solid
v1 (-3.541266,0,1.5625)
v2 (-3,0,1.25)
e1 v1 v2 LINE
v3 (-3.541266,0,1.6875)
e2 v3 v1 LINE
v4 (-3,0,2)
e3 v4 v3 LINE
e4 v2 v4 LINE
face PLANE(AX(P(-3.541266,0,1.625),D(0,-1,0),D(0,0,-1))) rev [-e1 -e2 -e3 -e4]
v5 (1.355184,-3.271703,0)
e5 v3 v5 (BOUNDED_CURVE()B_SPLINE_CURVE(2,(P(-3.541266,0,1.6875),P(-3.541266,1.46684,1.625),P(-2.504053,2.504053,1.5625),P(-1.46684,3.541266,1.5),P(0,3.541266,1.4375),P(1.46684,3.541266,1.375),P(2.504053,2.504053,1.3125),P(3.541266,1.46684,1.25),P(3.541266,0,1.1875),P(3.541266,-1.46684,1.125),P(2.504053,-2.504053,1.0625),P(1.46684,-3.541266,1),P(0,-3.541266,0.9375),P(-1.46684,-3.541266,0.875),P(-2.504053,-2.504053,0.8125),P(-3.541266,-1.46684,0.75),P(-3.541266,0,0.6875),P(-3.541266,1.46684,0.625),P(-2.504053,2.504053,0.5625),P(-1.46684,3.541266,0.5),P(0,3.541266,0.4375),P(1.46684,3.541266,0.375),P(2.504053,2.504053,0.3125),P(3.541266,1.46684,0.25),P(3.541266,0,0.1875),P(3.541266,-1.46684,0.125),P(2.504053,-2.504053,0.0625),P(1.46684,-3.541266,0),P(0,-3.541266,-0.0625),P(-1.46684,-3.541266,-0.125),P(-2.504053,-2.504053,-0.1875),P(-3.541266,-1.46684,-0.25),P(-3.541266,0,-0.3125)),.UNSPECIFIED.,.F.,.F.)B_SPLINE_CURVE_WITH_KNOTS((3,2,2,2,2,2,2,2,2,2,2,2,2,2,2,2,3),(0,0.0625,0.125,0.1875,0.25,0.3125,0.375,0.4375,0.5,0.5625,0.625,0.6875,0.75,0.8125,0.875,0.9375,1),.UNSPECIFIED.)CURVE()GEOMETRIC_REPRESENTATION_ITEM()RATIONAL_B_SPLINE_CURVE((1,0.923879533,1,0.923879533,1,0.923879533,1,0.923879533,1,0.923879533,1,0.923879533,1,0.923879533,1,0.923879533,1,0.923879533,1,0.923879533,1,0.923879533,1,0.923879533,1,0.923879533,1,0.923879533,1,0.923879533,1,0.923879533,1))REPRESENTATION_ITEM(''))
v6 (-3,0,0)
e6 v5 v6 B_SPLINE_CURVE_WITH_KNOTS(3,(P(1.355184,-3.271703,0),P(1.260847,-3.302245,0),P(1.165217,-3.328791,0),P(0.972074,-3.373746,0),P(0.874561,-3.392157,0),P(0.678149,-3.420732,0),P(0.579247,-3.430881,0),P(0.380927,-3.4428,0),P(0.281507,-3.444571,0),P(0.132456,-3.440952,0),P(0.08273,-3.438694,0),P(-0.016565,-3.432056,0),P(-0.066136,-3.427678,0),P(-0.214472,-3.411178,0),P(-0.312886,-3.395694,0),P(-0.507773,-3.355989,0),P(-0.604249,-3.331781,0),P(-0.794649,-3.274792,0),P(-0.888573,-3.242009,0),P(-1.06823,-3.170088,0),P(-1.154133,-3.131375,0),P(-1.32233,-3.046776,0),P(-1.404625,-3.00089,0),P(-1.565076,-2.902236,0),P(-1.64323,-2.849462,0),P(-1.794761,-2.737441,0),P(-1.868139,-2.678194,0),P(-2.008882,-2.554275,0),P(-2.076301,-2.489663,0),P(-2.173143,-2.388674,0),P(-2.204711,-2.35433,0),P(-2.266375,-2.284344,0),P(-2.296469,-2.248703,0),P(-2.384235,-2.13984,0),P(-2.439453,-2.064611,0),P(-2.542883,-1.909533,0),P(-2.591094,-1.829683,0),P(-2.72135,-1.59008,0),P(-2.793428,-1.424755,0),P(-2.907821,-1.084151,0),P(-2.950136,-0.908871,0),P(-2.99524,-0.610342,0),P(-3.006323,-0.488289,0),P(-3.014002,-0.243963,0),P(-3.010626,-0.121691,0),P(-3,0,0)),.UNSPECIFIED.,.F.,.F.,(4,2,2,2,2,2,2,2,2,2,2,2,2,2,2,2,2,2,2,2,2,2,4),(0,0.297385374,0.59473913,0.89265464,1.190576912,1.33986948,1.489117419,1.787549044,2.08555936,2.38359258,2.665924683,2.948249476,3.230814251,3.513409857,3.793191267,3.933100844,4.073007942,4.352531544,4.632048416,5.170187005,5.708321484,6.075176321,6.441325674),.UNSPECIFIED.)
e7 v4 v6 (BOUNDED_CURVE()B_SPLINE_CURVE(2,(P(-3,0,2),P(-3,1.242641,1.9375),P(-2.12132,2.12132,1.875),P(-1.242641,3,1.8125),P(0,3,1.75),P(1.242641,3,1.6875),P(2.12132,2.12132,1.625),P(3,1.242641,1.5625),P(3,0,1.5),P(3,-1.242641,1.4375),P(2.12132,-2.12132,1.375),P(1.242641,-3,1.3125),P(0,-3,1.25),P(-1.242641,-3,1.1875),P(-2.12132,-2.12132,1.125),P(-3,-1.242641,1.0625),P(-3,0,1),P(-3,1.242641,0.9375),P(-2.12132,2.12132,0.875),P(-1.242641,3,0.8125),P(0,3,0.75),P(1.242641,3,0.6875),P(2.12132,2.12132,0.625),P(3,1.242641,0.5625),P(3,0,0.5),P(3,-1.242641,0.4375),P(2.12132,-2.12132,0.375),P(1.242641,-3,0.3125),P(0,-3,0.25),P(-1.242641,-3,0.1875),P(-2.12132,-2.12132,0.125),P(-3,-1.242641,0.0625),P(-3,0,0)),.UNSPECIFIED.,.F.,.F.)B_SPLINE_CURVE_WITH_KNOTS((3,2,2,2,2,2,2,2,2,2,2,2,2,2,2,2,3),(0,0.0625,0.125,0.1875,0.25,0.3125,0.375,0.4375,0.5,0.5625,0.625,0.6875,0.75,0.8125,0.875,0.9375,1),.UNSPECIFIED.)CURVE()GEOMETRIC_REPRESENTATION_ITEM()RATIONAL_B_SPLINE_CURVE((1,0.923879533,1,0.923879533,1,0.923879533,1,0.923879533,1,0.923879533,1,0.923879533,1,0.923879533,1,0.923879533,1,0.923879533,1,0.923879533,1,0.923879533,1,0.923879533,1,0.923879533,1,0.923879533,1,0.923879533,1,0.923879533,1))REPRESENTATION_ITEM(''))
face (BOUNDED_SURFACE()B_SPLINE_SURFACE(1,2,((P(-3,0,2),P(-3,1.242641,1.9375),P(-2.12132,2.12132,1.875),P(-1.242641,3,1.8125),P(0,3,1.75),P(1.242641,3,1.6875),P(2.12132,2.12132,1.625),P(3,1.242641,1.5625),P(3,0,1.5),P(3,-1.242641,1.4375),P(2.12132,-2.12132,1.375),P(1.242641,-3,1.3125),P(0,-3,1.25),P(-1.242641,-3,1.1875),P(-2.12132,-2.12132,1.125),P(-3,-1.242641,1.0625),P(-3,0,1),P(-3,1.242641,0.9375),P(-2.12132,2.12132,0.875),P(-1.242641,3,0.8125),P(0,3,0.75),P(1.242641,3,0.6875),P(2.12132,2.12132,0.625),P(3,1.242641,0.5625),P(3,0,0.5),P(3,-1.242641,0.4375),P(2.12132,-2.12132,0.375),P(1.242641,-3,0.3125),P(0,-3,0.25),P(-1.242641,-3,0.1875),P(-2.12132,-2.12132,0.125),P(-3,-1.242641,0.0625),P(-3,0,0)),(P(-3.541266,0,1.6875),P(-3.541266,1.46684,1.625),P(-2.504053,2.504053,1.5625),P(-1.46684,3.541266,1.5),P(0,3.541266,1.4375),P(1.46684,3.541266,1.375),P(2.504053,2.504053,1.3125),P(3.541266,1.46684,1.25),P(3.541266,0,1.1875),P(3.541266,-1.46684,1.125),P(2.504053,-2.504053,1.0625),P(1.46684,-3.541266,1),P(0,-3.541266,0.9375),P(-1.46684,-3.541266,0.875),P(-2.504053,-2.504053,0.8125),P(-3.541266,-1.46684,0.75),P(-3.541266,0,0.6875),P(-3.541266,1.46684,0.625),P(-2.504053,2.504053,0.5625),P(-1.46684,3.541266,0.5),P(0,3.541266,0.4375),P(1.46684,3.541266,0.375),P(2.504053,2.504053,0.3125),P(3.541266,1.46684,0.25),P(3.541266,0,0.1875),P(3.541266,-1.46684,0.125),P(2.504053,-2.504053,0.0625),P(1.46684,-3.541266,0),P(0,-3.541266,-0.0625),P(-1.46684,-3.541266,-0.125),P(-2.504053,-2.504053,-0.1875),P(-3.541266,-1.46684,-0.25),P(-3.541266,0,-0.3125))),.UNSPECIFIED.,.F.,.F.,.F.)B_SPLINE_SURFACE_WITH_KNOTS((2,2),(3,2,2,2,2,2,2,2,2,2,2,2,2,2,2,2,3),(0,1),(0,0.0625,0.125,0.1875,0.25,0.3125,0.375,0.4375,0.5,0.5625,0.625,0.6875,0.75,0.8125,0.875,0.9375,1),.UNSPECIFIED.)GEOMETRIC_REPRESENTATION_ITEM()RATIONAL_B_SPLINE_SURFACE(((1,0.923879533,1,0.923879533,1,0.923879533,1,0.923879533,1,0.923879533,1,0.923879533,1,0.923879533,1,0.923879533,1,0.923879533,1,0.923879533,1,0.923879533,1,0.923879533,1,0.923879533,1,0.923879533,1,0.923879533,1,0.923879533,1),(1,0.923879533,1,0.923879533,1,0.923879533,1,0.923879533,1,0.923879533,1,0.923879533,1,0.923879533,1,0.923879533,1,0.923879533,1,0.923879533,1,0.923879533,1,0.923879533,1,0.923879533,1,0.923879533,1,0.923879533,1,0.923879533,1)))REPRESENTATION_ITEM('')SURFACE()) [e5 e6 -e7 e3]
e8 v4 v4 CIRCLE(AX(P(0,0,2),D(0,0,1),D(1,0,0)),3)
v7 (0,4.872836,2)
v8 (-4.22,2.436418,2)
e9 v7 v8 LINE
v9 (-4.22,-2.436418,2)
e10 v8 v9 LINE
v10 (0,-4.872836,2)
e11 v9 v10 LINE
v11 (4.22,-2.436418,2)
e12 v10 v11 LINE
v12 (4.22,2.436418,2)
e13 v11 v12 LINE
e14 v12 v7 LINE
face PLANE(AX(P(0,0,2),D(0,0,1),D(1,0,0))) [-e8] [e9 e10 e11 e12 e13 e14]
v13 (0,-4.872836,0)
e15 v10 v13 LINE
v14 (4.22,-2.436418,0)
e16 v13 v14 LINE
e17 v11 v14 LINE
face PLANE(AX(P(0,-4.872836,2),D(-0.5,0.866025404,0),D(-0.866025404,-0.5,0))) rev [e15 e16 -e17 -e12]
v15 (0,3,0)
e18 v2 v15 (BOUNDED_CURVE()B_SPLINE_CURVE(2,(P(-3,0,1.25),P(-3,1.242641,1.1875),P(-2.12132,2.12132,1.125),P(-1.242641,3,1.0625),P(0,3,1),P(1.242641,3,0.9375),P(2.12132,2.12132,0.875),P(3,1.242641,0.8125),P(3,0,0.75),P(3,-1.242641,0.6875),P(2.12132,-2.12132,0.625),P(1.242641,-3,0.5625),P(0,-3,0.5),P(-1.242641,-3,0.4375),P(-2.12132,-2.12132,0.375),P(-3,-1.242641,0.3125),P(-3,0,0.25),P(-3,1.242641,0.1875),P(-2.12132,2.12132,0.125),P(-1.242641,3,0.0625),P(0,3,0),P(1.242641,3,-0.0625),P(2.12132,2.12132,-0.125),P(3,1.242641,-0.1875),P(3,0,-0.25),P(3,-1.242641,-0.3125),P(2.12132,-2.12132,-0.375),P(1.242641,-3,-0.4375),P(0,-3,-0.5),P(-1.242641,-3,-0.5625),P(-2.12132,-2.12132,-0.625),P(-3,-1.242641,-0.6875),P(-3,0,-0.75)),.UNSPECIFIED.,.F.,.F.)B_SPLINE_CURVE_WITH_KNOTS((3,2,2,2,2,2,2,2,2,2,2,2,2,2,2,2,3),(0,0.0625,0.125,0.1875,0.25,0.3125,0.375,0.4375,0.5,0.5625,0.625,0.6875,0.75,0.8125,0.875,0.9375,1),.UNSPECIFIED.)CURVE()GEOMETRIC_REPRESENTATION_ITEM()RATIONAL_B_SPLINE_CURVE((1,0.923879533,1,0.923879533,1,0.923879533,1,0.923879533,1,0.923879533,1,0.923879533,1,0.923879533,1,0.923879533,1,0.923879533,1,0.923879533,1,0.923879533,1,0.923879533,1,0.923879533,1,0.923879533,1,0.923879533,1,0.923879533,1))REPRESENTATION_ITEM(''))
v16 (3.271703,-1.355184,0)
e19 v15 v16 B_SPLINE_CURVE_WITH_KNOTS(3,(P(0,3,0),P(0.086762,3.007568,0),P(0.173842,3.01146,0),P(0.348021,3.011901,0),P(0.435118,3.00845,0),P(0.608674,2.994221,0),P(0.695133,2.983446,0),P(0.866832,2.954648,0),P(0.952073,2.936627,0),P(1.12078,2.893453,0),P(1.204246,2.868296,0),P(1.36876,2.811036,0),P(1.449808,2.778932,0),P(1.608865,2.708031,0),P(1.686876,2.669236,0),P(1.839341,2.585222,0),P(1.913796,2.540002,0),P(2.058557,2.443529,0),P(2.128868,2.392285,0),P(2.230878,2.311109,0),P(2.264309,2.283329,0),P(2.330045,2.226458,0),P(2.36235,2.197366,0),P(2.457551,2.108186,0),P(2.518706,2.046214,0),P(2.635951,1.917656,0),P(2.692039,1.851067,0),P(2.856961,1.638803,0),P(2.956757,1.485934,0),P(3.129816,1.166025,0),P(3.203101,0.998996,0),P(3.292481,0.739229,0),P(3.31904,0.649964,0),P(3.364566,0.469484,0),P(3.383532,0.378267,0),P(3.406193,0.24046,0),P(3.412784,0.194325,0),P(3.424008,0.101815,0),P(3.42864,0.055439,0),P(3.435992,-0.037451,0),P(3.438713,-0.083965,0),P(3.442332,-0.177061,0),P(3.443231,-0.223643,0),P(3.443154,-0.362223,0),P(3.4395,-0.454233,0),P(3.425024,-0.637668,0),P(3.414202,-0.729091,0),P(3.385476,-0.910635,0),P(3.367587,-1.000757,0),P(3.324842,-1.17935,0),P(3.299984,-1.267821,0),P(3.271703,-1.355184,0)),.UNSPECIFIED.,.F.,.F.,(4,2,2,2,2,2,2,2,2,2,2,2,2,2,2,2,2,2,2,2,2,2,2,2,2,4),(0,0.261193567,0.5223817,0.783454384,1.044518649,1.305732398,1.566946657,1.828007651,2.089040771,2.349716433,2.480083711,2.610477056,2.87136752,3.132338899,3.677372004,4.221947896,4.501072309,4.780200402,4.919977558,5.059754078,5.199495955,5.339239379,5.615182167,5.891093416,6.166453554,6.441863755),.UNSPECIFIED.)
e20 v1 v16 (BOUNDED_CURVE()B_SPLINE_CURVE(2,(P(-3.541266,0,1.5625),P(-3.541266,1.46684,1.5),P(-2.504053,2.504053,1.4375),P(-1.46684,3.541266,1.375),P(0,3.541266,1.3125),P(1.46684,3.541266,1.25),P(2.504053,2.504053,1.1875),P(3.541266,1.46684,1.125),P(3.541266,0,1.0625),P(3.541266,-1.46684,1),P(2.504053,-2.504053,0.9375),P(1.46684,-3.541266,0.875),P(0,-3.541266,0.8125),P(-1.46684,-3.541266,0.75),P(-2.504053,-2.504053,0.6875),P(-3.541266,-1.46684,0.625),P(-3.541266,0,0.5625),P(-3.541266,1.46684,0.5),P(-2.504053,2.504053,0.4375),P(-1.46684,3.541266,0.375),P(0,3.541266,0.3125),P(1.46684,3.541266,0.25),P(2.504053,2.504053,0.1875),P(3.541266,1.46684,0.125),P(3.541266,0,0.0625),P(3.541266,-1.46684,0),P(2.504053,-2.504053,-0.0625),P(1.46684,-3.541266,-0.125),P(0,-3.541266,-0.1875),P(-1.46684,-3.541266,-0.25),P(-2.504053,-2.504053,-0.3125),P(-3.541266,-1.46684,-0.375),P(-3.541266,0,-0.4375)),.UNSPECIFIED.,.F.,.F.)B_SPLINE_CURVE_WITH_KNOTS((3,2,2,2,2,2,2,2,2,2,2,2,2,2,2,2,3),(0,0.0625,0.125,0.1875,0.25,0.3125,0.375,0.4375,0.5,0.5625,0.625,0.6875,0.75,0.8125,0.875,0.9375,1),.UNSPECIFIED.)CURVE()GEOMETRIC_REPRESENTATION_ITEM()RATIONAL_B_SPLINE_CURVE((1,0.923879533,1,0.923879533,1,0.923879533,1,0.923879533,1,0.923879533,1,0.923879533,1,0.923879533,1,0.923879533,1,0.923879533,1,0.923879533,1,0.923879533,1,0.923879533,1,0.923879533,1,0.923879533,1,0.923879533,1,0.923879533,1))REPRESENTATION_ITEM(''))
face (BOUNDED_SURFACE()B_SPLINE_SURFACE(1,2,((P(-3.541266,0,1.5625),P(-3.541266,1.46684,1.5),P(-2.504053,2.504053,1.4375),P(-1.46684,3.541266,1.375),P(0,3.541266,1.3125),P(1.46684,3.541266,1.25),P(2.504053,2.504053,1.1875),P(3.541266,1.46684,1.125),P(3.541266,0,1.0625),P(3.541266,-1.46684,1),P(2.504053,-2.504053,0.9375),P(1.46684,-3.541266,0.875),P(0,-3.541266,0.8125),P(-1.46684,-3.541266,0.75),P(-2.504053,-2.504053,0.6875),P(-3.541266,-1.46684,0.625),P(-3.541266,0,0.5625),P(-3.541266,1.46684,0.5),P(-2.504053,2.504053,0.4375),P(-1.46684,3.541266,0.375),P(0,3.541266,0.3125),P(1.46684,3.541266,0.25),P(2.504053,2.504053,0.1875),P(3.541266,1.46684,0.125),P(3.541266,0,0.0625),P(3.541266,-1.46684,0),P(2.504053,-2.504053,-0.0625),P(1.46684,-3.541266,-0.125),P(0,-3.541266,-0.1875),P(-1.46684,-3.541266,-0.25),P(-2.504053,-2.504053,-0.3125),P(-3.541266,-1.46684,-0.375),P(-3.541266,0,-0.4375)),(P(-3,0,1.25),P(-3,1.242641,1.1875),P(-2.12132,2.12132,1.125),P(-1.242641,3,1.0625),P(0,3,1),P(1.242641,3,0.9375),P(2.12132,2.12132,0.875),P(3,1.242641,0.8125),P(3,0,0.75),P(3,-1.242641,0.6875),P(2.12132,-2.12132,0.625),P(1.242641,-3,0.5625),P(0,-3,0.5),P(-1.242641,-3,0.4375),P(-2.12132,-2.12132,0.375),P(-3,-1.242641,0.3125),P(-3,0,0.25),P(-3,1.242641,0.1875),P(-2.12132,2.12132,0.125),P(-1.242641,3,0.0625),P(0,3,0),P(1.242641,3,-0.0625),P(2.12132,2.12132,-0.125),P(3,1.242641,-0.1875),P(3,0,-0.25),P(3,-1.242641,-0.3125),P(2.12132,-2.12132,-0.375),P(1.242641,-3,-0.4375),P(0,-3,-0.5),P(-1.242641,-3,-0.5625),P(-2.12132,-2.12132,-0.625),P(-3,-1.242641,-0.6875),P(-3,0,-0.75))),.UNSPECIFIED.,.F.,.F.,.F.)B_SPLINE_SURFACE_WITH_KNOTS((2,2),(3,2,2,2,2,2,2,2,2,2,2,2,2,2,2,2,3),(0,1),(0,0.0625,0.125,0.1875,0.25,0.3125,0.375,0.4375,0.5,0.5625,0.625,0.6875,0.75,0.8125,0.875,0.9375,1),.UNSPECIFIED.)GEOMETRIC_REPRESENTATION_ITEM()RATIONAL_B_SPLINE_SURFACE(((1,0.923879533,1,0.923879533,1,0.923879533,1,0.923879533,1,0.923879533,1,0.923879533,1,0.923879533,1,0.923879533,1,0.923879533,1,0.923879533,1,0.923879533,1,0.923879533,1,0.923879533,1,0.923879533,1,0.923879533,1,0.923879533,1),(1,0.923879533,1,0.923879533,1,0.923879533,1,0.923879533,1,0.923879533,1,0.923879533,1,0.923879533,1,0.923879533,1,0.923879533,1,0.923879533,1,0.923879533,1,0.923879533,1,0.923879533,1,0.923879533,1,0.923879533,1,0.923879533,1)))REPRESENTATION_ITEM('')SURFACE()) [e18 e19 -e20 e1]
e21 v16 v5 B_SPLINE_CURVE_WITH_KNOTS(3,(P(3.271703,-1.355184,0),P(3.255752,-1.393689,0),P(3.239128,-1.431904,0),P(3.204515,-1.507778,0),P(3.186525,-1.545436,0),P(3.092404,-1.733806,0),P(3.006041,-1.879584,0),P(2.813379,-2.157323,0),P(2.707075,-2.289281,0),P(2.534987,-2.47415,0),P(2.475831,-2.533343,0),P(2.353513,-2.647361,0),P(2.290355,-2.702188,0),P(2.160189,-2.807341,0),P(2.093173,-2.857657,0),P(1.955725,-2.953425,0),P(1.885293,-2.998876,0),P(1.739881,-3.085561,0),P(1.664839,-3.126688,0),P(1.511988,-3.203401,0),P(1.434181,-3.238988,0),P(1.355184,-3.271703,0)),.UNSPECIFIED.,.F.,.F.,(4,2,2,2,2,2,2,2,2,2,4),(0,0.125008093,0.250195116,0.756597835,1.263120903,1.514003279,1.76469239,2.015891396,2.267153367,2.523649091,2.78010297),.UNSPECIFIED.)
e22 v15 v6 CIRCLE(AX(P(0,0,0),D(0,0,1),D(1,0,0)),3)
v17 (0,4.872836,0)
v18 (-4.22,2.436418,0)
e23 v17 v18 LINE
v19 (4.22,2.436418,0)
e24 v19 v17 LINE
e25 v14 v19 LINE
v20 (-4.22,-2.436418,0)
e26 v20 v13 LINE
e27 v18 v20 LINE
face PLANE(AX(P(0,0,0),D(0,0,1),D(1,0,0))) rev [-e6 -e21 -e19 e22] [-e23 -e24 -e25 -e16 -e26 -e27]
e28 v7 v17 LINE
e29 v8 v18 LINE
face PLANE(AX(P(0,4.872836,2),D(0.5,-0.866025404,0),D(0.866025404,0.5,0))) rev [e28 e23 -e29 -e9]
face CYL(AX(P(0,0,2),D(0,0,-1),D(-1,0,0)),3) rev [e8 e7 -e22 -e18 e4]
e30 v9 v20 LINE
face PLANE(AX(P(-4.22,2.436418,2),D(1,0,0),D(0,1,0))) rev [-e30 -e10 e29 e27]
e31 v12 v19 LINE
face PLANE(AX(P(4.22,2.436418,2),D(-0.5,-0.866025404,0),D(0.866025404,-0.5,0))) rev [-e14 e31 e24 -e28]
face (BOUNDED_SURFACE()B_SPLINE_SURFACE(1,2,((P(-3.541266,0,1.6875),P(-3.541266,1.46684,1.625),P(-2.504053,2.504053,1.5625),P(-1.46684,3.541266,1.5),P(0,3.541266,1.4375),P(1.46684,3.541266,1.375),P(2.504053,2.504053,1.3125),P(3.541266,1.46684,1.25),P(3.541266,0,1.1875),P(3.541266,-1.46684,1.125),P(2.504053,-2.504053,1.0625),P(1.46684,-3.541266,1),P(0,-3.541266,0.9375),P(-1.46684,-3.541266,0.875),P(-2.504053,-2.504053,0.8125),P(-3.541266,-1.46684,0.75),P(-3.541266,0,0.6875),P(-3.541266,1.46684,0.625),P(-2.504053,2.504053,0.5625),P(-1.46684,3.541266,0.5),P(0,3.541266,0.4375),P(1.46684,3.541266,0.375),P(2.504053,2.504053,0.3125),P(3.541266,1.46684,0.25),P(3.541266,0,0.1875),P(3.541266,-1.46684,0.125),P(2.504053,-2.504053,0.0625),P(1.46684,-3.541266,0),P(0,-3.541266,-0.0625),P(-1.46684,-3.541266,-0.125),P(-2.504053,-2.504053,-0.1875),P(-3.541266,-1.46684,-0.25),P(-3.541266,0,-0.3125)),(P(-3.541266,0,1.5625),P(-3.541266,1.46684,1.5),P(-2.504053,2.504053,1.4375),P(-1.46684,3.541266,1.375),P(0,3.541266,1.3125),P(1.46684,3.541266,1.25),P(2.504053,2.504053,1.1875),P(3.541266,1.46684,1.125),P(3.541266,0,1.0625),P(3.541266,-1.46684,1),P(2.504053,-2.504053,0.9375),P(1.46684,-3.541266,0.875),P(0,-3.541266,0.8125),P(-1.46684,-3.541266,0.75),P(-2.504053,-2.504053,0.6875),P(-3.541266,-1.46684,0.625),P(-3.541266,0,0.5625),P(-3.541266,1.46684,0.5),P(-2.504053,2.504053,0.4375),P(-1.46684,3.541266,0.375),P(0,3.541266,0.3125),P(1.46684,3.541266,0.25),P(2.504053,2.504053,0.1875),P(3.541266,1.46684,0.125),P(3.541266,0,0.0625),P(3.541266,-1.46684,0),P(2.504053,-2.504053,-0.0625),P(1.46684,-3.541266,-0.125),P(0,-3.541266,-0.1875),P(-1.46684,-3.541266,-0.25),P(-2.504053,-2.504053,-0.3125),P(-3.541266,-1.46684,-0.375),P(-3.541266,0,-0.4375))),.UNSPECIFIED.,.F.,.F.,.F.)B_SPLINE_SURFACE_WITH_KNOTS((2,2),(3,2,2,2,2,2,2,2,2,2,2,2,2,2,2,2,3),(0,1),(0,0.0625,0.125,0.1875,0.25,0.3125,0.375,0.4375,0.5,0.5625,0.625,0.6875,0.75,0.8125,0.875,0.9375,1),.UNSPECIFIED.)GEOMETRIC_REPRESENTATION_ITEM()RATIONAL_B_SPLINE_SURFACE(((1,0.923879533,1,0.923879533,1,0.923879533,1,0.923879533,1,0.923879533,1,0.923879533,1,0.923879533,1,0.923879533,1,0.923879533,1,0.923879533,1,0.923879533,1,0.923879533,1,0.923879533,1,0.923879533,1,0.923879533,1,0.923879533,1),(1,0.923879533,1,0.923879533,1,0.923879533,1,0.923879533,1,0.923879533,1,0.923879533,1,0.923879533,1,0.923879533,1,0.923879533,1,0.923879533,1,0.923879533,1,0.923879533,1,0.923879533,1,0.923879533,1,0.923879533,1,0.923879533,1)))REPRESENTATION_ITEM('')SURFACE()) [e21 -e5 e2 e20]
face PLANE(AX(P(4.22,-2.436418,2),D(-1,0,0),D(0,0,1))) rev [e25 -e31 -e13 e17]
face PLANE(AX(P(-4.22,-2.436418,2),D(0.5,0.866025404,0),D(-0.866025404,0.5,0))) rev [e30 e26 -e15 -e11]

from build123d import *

# Parameters (mm, degrees)
SKETCH1_R           = 3
BOSS_EXTRUDE1_DEPTH = 2
THREAD1_PITCH       = 1


with BuildPart() as part:
    # Sketch1 → Boss-Extrude1 (new body)
    with BuildSketch(Plane.XY):
        Polygon((-4.22, -2.436418136), (0, -4.872836272), (4.22, -2.436418136), (4.22, 2.436418136), (0, 4.872836272), (-4.22, 2.436418136), align=None)
        Circle(SKETCH1_R, mode=Mode.SUBTRACT)
    extrude(amount=BOSS_EXTRUDE1_DEPTH)

    # Thread1: the profile of Thread Profile1 profile screwed along a right-hand helix of 2 turns, 8 arcs to a turn; built about Z, then put on its axis
    thread1_z = Axis((0, 0, 0), (0, 0, 1))
    thread1_corners = [(2.9997, 0, -0.000173205), (3.541265875, 0, 0.312499999), (3.541265875, 0, 0.437499999), (2.9997, 0, 0.750173202)]
    with BuildLine(mode=Mode.PRIVATE) as thread1_profile:
        Line(thread1_corners[0], thread1_corners[1])
        Line(thread1_corners[1], thread1_corners[2])
        Line(thread1_corners[2], thread1_corners[3])
        Line(thread1_corners[3], thread1_corners[0])
    thread1_cap = Face(thread1_profile.wire())
    thread1_turn_angles = [0, 22.5, 45, 67.5, 90, 112.5, 135, 157.5, 180, 202.5, 225, 247.5, 270, 292.5, 315, 337.5, 360]
    thread1_turn_weights = [1, 0.9238795325112867, 1, 0.9238795325112867, 1, 0.9238795325112867, 1, 0.9238795325112867, 1, 0.9238795325112867, 1, 0.9238795325112867, 1, 0.9238795325112867, 1, 0.9238795325112867, 1]
    thread1_turn_rails = [Edge.make_bspline([Vector(p[0], p[1], 0).rotate(thread1_z, thread1_turn_angles[k]) / thread1_turn_weights[k] + Vector(0, 0, p[2] + THREAD1_PITCH * thread1_turn_angles[k] / 360) for k in range(17)], [0, 0, 0, 1, 1, 2, 2, 3, 3, 4, 4, 5, 5, 6, 6, 7, 7, 8, 8, 8], 2, thread1_turn_weights) for p in thread1_corners]
    thread1_turn_sides = [Face.make_surface_from_curves(thread1_turn_rails[p[0]], thread1_turn_rails[p[1]]) for p in [(0, 1), (1, 2), (2, 3), (3, 0)]]
    thread1 = Plane(origin=(0, 0, 2), x_dir=(-1, 0, 0), z_dir=(0, 0, -1)) * Solid(Shell([*[p.moved(Location((0, 0, THREAD1_PITCH * i))) for i in range(2) for p in thread1_turn_sides], thread1_cap, thread1_cap.rotate(thread1_z, 720).moved(Location((0, 0, THREAD1_PITCH * 720 / 360)))]))
    add(thread1, mode=Mode.SUBTRACT)


solid = part.part
